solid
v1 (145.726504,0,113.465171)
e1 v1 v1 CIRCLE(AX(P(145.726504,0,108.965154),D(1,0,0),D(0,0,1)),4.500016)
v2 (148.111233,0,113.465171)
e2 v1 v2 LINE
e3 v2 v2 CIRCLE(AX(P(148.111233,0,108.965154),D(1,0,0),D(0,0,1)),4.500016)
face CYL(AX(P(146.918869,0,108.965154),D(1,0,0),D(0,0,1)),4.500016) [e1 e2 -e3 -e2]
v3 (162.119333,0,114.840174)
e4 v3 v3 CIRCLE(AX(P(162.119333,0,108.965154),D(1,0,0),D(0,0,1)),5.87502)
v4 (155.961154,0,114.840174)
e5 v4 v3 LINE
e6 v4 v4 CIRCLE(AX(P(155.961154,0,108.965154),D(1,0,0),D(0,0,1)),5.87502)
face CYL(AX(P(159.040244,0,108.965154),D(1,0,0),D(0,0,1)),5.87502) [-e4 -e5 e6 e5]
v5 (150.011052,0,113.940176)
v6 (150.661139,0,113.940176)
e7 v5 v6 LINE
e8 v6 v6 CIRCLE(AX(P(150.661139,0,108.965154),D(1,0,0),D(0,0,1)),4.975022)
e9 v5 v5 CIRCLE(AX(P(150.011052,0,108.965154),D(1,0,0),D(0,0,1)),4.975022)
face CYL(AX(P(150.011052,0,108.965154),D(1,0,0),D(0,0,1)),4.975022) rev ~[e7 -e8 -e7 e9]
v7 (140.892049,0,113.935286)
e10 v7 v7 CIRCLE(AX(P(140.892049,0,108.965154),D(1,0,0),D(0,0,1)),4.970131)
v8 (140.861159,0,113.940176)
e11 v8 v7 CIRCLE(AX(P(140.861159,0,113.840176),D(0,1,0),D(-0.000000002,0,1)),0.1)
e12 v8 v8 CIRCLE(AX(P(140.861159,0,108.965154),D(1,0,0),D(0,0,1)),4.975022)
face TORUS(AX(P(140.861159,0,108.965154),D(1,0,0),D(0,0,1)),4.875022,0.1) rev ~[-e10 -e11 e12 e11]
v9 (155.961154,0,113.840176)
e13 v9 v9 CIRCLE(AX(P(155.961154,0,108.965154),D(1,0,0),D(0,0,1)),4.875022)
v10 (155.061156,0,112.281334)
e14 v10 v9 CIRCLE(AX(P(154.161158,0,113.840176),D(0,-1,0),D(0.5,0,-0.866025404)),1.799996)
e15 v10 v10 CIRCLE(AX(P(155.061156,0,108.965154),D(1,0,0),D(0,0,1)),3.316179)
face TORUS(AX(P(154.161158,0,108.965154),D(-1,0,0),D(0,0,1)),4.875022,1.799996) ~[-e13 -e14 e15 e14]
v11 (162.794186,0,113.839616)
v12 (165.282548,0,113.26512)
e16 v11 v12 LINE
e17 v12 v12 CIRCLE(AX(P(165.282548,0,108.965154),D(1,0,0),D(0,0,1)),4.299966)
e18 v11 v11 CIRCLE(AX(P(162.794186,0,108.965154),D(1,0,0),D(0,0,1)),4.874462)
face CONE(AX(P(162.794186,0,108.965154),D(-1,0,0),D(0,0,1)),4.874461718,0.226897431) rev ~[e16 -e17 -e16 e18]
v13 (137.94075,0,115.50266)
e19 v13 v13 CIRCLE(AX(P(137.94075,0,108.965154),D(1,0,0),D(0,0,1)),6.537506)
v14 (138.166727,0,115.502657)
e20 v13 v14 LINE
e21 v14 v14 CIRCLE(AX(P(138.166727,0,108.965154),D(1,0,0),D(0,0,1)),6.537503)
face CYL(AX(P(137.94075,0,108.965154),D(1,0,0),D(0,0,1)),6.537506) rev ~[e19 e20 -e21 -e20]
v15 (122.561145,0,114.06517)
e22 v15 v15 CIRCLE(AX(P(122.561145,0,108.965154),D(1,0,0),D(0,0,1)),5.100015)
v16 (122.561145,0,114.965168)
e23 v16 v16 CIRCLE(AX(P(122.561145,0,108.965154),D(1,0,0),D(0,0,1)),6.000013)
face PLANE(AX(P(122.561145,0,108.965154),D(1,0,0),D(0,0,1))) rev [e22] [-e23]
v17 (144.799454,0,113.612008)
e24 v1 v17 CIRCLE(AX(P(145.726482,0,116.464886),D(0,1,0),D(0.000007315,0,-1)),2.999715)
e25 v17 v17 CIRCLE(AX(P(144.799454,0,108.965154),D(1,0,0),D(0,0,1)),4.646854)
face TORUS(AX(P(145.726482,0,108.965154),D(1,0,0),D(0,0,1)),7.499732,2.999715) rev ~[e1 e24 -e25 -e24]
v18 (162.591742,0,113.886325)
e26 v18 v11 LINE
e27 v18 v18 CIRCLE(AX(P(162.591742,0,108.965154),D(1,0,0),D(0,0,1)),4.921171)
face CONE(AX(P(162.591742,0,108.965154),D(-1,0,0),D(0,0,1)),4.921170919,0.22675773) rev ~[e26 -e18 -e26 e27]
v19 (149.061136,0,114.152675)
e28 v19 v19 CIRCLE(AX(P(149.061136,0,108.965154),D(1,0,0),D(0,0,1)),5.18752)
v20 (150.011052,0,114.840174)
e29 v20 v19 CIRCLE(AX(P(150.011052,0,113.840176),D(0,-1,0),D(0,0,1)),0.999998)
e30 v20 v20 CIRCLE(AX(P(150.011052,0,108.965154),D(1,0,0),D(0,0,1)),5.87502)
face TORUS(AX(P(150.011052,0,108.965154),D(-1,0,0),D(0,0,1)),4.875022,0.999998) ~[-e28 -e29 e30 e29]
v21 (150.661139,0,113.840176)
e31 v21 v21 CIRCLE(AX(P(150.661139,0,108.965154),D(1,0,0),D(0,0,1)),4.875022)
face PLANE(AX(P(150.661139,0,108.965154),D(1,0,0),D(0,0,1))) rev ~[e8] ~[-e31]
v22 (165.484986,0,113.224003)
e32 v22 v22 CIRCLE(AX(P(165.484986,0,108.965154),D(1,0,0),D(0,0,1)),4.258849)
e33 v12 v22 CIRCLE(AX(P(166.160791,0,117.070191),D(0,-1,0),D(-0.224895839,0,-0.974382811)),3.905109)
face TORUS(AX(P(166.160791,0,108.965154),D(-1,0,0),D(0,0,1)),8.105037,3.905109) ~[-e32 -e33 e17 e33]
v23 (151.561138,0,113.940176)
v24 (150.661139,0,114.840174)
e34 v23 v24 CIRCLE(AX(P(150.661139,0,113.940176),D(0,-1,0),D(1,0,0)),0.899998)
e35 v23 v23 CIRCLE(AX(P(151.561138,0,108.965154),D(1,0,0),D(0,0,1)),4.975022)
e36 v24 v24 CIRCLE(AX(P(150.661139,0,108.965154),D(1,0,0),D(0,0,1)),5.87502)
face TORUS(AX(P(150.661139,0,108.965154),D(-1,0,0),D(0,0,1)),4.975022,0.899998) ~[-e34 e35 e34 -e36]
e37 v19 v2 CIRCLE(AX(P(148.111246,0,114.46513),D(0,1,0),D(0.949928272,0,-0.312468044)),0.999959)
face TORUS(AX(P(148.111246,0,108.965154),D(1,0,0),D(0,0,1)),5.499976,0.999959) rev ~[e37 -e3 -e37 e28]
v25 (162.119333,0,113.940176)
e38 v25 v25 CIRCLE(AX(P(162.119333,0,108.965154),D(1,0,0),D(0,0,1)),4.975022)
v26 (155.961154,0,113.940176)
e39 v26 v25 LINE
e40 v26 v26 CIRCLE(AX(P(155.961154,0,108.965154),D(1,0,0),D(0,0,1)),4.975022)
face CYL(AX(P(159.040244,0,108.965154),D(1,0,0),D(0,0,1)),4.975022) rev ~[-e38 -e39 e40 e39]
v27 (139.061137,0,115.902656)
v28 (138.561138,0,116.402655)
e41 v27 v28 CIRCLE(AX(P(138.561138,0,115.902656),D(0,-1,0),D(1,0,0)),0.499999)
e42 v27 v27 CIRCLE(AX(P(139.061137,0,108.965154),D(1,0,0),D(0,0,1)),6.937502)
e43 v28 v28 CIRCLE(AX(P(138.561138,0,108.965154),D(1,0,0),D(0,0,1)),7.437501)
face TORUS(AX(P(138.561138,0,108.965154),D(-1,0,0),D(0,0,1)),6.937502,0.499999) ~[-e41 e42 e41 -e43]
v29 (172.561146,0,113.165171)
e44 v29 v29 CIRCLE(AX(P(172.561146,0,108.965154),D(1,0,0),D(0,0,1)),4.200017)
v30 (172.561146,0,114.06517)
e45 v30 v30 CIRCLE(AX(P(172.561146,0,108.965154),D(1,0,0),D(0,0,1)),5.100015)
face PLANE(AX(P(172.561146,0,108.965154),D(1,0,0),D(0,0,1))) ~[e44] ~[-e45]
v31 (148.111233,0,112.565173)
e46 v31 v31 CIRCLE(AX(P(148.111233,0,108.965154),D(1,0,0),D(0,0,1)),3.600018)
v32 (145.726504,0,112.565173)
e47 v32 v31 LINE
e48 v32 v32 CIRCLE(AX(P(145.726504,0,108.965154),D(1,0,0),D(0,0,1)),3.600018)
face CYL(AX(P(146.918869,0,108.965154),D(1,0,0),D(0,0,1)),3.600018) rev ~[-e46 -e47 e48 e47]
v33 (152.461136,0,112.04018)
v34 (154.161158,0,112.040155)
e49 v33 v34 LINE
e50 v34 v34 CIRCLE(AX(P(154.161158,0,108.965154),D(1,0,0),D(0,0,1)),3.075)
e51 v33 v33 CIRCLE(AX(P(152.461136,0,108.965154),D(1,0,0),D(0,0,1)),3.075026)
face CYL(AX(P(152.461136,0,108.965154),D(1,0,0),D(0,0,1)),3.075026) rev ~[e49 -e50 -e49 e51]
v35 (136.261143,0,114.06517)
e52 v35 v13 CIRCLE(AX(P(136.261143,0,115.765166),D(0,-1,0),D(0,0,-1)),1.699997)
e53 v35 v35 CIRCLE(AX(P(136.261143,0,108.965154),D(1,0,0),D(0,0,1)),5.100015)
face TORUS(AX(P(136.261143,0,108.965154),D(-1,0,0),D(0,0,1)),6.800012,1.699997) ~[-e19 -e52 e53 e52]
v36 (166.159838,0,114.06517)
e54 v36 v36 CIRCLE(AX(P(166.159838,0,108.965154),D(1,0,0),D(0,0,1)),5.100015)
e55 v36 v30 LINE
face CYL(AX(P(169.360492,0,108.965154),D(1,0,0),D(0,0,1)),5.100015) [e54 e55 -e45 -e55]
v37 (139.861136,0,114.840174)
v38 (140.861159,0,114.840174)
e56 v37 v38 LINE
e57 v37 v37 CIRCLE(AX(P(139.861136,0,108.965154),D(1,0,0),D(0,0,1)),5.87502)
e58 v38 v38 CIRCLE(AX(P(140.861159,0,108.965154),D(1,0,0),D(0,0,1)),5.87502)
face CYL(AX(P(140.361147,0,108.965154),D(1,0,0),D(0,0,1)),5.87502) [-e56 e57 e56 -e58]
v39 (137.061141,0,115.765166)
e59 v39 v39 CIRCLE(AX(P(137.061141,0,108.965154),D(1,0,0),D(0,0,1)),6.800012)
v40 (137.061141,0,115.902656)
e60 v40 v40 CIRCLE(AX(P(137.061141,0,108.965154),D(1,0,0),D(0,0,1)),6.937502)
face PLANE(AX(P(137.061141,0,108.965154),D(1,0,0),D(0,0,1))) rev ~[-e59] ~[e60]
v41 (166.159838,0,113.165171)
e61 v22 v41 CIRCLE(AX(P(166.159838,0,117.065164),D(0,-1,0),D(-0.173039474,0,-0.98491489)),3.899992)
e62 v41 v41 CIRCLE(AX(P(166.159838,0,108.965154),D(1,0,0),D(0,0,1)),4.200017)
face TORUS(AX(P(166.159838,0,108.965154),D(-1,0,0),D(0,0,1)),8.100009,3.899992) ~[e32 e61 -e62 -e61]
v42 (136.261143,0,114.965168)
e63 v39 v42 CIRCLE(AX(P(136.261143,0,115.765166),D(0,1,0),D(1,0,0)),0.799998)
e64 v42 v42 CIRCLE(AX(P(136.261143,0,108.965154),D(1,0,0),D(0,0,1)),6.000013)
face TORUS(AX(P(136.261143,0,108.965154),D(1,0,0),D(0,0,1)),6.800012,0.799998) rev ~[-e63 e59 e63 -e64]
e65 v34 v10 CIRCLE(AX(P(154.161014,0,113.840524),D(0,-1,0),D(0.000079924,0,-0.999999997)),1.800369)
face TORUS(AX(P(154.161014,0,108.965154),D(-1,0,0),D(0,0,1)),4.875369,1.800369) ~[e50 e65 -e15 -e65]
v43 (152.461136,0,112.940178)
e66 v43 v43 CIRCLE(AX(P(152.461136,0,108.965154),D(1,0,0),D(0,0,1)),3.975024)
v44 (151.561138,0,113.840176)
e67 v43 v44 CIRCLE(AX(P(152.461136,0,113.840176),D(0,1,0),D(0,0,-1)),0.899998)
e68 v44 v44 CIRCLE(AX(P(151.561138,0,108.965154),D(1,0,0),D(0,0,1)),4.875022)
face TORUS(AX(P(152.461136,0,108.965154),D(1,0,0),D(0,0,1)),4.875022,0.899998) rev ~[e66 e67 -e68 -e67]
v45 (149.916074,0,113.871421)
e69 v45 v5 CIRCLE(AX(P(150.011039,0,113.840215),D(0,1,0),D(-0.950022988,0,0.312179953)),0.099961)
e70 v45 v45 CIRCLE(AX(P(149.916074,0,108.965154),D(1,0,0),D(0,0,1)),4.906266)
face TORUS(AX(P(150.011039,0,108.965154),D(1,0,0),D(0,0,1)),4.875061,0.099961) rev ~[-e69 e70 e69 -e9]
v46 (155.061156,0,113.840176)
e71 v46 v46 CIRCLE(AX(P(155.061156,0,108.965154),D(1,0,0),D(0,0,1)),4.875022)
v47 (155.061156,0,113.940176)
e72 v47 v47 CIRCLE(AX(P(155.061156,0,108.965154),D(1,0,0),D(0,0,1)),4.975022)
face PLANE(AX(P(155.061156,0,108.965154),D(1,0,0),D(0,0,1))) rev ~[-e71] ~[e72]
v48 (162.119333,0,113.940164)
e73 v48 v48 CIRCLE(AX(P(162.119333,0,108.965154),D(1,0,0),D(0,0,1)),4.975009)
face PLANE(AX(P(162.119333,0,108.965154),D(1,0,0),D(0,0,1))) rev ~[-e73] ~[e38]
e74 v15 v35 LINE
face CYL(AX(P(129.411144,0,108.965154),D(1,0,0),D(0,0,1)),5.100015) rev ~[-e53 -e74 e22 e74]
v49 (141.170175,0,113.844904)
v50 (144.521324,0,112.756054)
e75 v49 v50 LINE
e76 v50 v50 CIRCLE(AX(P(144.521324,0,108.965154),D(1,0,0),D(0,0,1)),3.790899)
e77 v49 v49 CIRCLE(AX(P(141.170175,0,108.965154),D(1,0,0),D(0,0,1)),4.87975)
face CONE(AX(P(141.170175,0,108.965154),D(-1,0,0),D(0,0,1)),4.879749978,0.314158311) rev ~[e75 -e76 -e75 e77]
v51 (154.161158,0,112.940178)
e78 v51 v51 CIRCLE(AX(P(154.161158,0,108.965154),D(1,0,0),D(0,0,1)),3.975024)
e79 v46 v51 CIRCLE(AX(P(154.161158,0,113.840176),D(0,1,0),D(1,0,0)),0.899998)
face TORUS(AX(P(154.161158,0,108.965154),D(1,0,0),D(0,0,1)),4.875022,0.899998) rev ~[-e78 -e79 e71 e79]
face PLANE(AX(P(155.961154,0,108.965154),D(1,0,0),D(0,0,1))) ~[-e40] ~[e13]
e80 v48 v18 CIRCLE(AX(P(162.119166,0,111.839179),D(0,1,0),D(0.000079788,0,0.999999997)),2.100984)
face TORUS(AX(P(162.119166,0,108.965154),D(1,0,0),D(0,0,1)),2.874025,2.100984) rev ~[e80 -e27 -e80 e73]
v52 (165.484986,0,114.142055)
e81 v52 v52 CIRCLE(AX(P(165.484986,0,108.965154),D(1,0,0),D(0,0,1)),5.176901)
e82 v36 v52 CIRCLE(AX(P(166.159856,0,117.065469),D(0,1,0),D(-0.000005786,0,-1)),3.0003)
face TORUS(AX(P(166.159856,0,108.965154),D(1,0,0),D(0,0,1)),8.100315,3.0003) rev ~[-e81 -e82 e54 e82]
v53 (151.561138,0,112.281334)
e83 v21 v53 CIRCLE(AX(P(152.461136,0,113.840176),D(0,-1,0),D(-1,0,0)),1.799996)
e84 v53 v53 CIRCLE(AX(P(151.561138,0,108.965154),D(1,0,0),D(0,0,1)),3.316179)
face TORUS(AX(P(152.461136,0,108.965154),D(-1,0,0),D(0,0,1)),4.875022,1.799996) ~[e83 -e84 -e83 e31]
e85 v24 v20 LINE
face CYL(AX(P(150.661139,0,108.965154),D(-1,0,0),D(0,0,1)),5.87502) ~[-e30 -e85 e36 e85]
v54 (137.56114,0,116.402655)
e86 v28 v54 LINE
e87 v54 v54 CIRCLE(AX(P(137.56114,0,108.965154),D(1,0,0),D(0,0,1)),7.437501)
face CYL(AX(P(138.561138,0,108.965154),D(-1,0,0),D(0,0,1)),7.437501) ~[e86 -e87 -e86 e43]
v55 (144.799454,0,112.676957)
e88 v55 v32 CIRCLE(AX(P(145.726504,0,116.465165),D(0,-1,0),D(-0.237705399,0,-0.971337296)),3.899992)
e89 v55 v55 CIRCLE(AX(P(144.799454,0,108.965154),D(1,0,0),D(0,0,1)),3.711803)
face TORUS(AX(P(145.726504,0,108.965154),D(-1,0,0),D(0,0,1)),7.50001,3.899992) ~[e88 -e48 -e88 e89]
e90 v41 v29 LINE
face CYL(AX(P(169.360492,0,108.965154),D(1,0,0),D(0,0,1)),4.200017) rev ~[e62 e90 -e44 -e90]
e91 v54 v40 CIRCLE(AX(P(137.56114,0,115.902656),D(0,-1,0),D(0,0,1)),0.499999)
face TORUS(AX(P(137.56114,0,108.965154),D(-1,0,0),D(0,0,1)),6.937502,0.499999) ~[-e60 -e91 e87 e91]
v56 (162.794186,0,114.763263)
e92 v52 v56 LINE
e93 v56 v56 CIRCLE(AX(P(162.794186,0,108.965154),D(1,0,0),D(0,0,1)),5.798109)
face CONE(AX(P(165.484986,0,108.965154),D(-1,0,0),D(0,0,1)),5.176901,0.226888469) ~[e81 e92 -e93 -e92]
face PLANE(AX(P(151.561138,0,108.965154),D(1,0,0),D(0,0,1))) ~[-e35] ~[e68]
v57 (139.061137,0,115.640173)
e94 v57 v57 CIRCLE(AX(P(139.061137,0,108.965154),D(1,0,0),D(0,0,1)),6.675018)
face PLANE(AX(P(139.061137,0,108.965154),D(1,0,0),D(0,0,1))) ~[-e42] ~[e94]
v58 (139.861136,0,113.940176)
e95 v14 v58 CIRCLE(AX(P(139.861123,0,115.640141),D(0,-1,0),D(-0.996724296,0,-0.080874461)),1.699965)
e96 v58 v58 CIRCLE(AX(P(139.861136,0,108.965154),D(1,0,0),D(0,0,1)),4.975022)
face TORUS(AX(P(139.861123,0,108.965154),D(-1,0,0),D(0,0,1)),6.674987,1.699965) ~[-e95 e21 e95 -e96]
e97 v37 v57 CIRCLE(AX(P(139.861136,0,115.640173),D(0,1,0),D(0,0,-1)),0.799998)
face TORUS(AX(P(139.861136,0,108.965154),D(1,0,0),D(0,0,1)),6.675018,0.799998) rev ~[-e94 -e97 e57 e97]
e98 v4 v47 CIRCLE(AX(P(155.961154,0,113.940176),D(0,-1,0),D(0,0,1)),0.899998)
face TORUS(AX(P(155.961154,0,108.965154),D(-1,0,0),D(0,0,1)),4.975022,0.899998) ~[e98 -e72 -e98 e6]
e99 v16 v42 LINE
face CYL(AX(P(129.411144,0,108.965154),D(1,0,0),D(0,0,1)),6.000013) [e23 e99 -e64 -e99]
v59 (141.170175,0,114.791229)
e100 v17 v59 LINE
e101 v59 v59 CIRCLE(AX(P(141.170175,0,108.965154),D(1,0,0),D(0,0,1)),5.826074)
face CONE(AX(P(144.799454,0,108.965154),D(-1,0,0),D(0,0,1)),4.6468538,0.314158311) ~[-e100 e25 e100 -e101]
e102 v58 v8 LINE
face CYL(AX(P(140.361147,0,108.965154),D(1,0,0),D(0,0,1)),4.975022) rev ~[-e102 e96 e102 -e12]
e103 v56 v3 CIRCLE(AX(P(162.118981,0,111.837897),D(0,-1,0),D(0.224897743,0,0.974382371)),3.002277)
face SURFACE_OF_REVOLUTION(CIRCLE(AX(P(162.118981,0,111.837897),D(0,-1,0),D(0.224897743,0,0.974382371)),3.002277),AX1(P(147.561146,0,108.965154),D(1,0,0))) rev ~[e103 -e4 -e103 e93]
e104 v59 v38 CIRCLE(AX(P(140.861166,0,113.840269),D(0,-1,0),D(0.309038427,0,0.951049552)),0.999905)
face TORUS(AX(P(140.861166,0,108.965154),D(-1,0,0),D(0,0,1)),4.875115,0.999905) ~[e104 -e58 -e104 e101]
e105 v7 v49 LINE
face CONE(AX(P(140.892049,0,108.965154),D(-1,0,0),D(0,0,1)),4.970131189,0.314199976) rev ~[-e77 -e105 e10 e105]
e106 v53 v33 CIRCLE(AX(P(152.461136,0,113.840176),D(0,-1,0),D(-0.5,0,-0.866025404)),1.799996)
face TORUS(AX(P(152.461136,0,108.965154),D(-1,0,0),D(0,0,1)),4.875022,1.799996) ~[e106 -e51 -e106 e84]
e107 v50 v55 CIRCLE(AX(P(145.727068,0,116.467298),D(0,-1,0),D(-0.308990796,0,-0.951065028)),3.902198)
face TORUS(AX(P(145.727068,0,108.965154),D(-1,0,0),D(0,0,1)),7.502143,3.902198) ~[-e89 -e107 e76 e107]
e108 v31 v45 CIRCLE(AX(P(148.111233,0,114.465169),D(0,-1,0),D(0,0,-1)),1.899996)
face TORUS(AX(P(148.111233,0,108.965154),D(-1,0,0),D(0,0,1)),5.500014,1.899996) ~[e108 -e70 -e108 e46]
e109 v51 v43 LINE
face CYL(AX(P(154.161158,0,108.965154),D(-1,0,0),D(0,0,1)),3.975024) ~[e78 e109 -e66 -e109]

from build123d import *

# Parameters (mm, degrees)
F0_W   = 13.699998
F0_H   = 0.8999982
F0_W_2 = 1.0000234
F0_W_3 = 2.3847298
F0_W_4 = 6.1581792
F0_W_5 = 6.401308


# Not quite as in the source:
# - ends of sketch curves that miss each other by under 0.0002 mm in the source are joined


with BuildPart() as f1:
    # F0 (on Front) → F1 (revolve)
    with BuildSketch(Plane.XZ):
        with Locations((129.4111438469, 114.5151687034)):
            Rectangle(F0_W, F0_H)
        with BuildLine():
            ThreePointArc((137.0611412469, 115.7651662034), (136.8268271404, 115.1994819099), (136.2611428469, 114.9651678034))
            Line((136.2611428469, 114.9651678034), (136.2611428469, 114.0651696034))
            ThreePointArc((136.2611428469, 114.0651696034), (137.3665226637, 114.4736074938), (137.9407496531, 115.502660172))
            Line((137.9407496531, 115.502660172), (138.1667270469, 115.5026572034))
            ThreePointArc((138.1667270469, 115.5026572034), (138.7087012526, 114.390419465), (139.8611356469, 113.9401762034))
            Line((139.8611356469, 113.9401762034), (139.8611356469, 114.8401744034))
            ThreePointArc((139.8611356469, 114.8401744034), (139.2954513533, 115.0744885099), (139.0611372469, 115.6401728034))
            Line((139.0611372469, 115.6401728034), (139.0611372469, 115.9026564034))
            ThreePointArc((139.0611372469, 115.9026564034), (138.9146909303, 116.2562090869), (138.5611382469, 116.4026554034))
            Line((138.5611382469, 116.4026554034), (137.5611402469, 116.4026554034))
            ThreePointArc((137.5611402469, 116.4026554034), (137.2075875634, 116.2562090869), (137.0611412469, 115.9026564034))
            Line((137.0611412469, 115.9026564034), (137.0611412469, 115.7651662034))
        make_face()
        with Locations((140.3611473469, 114.3901753034)):
            Rectangle(F0_W_2, F0_H)
        with BuildLine():
            Line((140.8611590469, 114.8401744034), (140.8611590469, 113.9401762034))
            ThreePointArc((140.8611590469, 113.9401762034), (140.8767965043, 113.9389459834), (140.8920492107, 113.9352855922))
            Line((140.8920492107, 113.9352855922), (141.1701754469, 113.8449043819))
            Line((141.1701754469, 113.8449043819), (141.1701754469, 114.7912286034))
            ThreePointArc((141.1701754469, 114.7912286034), (141.0175935786, 114.8278627086), (140.8611590469, 114.8401744034))
        make_face()
        with BuildLine():
            Line((141.1701754469, 114.7912286034), (141.1701754469, 113.8449043819))
            Line((141.1701754469, 113.8449043819), (144.5213244469, 112.7560536034))
            ThreePointArc((144.5213244469, 112.7560536034), (144.6596565752, 112.7139281426), (144.7994544469, 112.6769569236))
            Line((144.7994544469, 112.6769569236), (144.7994544469, 113.6120082034))
            Line((144.7994544469, 113.6120082034), (141.1701754469, 114.7912286034))
        make_face()
        with BuildLine():
            Line((144.7994544469, 113.6120082034), (144.7994544469, 112.6769569236))
            ThreePointArc((144.7994544469, 112.6769569236), (145.2596214472, 112.5932195337), (145.7265036469, 112.5651726034))
            Line((145.7265036469, 112.5651726034), (145.7265036469, 113.4651708034))
            ThreePointArc((145.7265036469, 113.4651708034), (145.2572000517, 113.5021058881), (144.7994544469, 113.6120082034))
        make_face()
        with BuildLine():
            Line((148.1112334469, 113.4651708034), (148.1112334469, 112.5651726034))
            ThreePointArc((148.1112334469, 112.5651726034), (149.2252053215, 112.9259962262), (149.9160738578, 113.8714208343))
            ThreePointArc((149.9160738578, 113.8714208343), (149.9524213693, 113.9211852123), (150.0110518469, 113.9401762034))
            Line((150.0110518469, 113.9401762034), (150.6611394469, 113.9401762034))
            Line((150.6611394469, 113.9401762034), (150.6611394469, 113.8401764034))
            ThreePointArc((150.6611394469, 113.8401764034), (150.9022932377, 112.9401782034), (151.5611376469, 112.2813337943))
            Line((151.5611376469, 112.2813337943), (151.5611376469, 113.8401764034))
            Line((151.5611376469, 113.8401764034), (151.5611376469, 113.9401762034))
            ThreePointArc((151.5611376469, 113.9401762034), (151.2975342771, 114.5765710337), (150.6611394469, 114.8401744034))
            Line((150.6611394469, 114.8401744034), (150.0110518469, 114.8401744034))
            ThreePointArc((150.0110518469, 114.8401744034), (149.4247506708, 114.6502670965), (149.061135695, 114.1526748904))
            ThreePointArc((149.061135695, 114.1526748904), (148.6975346229, 113.6550781104), (148.1112334469, 113.4651708034))
        make_face()
        with Locations((146.9188685469, 113.0151717034)):
            Rectangle(F0_W_3, F0_H)
        with BuildLine():
            Line((151.5611376469, 113.8401764034), (151.5611376469, 112.2813337943))
            ThreePointArc((151.5611376469, 112.2813337943), (151.9952624974, 112.1015133935), (152.4611358469, 112.0401800034))
            Line((152.4611358469, 112.0401800034), (154.1611578469, 112.0401546034))
            ThreePointArc((154.1611578469, 112.0401546034), (154.6270311963, 112.1015133935), (155.0611560469, 112.2813337943))
            Line((155.0611560469, 112.2813337943), (155.0611560469, 113.8401764034))
            ThreePointArc((155.0611560469, 113.8401764034), (154.7975526771, 113.2037815732), (154.1611578469, 112.9401782034))
            Line((154.1611578469, 112.9401782034), (152.4611358469, 112.9401782034))
            ThreePointArc((152.4611358469, 112.9401782034), (151.8247410166, 113.2037815732), (151.5611376469, 113.8401764034))
        make_face()
        with BuildLine():
            Line((155.0611560469, 113.8401764034), (155.0611560469, 112.2813337943))
            ThreePointArc((155.0611560469, 112.2813337943), (155.720000456, 112.9401782034), (155.9611542469, 113.8401764034))
            Line((155.9611542469, 113.8401764034), (155.9611542469, 113.9401762034))
            Line((155.9611542469, 113.9401762034), (155.9611542469, 114.8401744034))
            ThreePointArc((155.9611542469, 114.8401744034), (155.3247594166, 114.5765710337), (155.0611560469, 113.9401762034))
            Line((155.0611560469, 113.9401762034), (155.0611560469, 113.8401764034))
        make_face()
        with Locations((159.0402438469, 114.3901753034)):
            Rectangle(F0_W_4, F0_H)
        with BuildLine():
            Line((162.1193334469, 114.8401744034), (162.1193334469, 113.9401635034))
            ThreePointArc((162.1193334469, 113.9401635034), (162.3570657373, 113.9266510418), (162.5917415175, 113.8863253226))
            Line((162.5917415175, 113.8863253226), (162.7941860469, 113.8396161217))
            Line((162.7941860469, 113.8396161217), (162.7941860469, 114.7632632034))
            ThreePointArc((162.7941860469, 114.7632632034), (162.4589423593, 114.8208646147), (162.1193334469, 114.8401744034))
        make_face()
        with BuildLine():
            Line((162.7941860469, 114.7632632034), (162.7941860469, 113.8396161217))
            Line((162.7941860469, 113.8396161217), (165.2825478469, 113.2651204034))
            ThreePointArc((165.2825478469, 113.2651204034), (165.3834949467, 113.2432230061), (165.4849858469, 113.2240032152))
            Line((165.4849858469, 113.2240032152), (165.4849858469, 114.1420554034))
            Line((165.4849858469, 114.1420554034), (162.7941860469, 114.7632632034))
        make_face()
        with Locations((169.3604924469, 113.6151705034)):
            Rectangle(F0_W_5, F0_H)
        with BuildLine():
            Line((165.4849858469, 114.1420554034), (165.4849858469, 113.2240032152))
            ThreePointArc((165.4849858469, 113.2240032152), (165.8211323745, 113.1799071954), (166.1598384469, 113.1651714034))
            Line((166.1598384469, 113.1651714034), (166.1598384469, 114.0651696034))
            ThreePointArc((166.1598384469, 114.0651696034), (165.8202295344, 114.0844539922), (165.4849858469, 114.1420554034))
        make_face()
    revolve(axis=Axis((147.5611456469, 0, 108.9651544034), (1, 0, 0)))


solid = f1.part
